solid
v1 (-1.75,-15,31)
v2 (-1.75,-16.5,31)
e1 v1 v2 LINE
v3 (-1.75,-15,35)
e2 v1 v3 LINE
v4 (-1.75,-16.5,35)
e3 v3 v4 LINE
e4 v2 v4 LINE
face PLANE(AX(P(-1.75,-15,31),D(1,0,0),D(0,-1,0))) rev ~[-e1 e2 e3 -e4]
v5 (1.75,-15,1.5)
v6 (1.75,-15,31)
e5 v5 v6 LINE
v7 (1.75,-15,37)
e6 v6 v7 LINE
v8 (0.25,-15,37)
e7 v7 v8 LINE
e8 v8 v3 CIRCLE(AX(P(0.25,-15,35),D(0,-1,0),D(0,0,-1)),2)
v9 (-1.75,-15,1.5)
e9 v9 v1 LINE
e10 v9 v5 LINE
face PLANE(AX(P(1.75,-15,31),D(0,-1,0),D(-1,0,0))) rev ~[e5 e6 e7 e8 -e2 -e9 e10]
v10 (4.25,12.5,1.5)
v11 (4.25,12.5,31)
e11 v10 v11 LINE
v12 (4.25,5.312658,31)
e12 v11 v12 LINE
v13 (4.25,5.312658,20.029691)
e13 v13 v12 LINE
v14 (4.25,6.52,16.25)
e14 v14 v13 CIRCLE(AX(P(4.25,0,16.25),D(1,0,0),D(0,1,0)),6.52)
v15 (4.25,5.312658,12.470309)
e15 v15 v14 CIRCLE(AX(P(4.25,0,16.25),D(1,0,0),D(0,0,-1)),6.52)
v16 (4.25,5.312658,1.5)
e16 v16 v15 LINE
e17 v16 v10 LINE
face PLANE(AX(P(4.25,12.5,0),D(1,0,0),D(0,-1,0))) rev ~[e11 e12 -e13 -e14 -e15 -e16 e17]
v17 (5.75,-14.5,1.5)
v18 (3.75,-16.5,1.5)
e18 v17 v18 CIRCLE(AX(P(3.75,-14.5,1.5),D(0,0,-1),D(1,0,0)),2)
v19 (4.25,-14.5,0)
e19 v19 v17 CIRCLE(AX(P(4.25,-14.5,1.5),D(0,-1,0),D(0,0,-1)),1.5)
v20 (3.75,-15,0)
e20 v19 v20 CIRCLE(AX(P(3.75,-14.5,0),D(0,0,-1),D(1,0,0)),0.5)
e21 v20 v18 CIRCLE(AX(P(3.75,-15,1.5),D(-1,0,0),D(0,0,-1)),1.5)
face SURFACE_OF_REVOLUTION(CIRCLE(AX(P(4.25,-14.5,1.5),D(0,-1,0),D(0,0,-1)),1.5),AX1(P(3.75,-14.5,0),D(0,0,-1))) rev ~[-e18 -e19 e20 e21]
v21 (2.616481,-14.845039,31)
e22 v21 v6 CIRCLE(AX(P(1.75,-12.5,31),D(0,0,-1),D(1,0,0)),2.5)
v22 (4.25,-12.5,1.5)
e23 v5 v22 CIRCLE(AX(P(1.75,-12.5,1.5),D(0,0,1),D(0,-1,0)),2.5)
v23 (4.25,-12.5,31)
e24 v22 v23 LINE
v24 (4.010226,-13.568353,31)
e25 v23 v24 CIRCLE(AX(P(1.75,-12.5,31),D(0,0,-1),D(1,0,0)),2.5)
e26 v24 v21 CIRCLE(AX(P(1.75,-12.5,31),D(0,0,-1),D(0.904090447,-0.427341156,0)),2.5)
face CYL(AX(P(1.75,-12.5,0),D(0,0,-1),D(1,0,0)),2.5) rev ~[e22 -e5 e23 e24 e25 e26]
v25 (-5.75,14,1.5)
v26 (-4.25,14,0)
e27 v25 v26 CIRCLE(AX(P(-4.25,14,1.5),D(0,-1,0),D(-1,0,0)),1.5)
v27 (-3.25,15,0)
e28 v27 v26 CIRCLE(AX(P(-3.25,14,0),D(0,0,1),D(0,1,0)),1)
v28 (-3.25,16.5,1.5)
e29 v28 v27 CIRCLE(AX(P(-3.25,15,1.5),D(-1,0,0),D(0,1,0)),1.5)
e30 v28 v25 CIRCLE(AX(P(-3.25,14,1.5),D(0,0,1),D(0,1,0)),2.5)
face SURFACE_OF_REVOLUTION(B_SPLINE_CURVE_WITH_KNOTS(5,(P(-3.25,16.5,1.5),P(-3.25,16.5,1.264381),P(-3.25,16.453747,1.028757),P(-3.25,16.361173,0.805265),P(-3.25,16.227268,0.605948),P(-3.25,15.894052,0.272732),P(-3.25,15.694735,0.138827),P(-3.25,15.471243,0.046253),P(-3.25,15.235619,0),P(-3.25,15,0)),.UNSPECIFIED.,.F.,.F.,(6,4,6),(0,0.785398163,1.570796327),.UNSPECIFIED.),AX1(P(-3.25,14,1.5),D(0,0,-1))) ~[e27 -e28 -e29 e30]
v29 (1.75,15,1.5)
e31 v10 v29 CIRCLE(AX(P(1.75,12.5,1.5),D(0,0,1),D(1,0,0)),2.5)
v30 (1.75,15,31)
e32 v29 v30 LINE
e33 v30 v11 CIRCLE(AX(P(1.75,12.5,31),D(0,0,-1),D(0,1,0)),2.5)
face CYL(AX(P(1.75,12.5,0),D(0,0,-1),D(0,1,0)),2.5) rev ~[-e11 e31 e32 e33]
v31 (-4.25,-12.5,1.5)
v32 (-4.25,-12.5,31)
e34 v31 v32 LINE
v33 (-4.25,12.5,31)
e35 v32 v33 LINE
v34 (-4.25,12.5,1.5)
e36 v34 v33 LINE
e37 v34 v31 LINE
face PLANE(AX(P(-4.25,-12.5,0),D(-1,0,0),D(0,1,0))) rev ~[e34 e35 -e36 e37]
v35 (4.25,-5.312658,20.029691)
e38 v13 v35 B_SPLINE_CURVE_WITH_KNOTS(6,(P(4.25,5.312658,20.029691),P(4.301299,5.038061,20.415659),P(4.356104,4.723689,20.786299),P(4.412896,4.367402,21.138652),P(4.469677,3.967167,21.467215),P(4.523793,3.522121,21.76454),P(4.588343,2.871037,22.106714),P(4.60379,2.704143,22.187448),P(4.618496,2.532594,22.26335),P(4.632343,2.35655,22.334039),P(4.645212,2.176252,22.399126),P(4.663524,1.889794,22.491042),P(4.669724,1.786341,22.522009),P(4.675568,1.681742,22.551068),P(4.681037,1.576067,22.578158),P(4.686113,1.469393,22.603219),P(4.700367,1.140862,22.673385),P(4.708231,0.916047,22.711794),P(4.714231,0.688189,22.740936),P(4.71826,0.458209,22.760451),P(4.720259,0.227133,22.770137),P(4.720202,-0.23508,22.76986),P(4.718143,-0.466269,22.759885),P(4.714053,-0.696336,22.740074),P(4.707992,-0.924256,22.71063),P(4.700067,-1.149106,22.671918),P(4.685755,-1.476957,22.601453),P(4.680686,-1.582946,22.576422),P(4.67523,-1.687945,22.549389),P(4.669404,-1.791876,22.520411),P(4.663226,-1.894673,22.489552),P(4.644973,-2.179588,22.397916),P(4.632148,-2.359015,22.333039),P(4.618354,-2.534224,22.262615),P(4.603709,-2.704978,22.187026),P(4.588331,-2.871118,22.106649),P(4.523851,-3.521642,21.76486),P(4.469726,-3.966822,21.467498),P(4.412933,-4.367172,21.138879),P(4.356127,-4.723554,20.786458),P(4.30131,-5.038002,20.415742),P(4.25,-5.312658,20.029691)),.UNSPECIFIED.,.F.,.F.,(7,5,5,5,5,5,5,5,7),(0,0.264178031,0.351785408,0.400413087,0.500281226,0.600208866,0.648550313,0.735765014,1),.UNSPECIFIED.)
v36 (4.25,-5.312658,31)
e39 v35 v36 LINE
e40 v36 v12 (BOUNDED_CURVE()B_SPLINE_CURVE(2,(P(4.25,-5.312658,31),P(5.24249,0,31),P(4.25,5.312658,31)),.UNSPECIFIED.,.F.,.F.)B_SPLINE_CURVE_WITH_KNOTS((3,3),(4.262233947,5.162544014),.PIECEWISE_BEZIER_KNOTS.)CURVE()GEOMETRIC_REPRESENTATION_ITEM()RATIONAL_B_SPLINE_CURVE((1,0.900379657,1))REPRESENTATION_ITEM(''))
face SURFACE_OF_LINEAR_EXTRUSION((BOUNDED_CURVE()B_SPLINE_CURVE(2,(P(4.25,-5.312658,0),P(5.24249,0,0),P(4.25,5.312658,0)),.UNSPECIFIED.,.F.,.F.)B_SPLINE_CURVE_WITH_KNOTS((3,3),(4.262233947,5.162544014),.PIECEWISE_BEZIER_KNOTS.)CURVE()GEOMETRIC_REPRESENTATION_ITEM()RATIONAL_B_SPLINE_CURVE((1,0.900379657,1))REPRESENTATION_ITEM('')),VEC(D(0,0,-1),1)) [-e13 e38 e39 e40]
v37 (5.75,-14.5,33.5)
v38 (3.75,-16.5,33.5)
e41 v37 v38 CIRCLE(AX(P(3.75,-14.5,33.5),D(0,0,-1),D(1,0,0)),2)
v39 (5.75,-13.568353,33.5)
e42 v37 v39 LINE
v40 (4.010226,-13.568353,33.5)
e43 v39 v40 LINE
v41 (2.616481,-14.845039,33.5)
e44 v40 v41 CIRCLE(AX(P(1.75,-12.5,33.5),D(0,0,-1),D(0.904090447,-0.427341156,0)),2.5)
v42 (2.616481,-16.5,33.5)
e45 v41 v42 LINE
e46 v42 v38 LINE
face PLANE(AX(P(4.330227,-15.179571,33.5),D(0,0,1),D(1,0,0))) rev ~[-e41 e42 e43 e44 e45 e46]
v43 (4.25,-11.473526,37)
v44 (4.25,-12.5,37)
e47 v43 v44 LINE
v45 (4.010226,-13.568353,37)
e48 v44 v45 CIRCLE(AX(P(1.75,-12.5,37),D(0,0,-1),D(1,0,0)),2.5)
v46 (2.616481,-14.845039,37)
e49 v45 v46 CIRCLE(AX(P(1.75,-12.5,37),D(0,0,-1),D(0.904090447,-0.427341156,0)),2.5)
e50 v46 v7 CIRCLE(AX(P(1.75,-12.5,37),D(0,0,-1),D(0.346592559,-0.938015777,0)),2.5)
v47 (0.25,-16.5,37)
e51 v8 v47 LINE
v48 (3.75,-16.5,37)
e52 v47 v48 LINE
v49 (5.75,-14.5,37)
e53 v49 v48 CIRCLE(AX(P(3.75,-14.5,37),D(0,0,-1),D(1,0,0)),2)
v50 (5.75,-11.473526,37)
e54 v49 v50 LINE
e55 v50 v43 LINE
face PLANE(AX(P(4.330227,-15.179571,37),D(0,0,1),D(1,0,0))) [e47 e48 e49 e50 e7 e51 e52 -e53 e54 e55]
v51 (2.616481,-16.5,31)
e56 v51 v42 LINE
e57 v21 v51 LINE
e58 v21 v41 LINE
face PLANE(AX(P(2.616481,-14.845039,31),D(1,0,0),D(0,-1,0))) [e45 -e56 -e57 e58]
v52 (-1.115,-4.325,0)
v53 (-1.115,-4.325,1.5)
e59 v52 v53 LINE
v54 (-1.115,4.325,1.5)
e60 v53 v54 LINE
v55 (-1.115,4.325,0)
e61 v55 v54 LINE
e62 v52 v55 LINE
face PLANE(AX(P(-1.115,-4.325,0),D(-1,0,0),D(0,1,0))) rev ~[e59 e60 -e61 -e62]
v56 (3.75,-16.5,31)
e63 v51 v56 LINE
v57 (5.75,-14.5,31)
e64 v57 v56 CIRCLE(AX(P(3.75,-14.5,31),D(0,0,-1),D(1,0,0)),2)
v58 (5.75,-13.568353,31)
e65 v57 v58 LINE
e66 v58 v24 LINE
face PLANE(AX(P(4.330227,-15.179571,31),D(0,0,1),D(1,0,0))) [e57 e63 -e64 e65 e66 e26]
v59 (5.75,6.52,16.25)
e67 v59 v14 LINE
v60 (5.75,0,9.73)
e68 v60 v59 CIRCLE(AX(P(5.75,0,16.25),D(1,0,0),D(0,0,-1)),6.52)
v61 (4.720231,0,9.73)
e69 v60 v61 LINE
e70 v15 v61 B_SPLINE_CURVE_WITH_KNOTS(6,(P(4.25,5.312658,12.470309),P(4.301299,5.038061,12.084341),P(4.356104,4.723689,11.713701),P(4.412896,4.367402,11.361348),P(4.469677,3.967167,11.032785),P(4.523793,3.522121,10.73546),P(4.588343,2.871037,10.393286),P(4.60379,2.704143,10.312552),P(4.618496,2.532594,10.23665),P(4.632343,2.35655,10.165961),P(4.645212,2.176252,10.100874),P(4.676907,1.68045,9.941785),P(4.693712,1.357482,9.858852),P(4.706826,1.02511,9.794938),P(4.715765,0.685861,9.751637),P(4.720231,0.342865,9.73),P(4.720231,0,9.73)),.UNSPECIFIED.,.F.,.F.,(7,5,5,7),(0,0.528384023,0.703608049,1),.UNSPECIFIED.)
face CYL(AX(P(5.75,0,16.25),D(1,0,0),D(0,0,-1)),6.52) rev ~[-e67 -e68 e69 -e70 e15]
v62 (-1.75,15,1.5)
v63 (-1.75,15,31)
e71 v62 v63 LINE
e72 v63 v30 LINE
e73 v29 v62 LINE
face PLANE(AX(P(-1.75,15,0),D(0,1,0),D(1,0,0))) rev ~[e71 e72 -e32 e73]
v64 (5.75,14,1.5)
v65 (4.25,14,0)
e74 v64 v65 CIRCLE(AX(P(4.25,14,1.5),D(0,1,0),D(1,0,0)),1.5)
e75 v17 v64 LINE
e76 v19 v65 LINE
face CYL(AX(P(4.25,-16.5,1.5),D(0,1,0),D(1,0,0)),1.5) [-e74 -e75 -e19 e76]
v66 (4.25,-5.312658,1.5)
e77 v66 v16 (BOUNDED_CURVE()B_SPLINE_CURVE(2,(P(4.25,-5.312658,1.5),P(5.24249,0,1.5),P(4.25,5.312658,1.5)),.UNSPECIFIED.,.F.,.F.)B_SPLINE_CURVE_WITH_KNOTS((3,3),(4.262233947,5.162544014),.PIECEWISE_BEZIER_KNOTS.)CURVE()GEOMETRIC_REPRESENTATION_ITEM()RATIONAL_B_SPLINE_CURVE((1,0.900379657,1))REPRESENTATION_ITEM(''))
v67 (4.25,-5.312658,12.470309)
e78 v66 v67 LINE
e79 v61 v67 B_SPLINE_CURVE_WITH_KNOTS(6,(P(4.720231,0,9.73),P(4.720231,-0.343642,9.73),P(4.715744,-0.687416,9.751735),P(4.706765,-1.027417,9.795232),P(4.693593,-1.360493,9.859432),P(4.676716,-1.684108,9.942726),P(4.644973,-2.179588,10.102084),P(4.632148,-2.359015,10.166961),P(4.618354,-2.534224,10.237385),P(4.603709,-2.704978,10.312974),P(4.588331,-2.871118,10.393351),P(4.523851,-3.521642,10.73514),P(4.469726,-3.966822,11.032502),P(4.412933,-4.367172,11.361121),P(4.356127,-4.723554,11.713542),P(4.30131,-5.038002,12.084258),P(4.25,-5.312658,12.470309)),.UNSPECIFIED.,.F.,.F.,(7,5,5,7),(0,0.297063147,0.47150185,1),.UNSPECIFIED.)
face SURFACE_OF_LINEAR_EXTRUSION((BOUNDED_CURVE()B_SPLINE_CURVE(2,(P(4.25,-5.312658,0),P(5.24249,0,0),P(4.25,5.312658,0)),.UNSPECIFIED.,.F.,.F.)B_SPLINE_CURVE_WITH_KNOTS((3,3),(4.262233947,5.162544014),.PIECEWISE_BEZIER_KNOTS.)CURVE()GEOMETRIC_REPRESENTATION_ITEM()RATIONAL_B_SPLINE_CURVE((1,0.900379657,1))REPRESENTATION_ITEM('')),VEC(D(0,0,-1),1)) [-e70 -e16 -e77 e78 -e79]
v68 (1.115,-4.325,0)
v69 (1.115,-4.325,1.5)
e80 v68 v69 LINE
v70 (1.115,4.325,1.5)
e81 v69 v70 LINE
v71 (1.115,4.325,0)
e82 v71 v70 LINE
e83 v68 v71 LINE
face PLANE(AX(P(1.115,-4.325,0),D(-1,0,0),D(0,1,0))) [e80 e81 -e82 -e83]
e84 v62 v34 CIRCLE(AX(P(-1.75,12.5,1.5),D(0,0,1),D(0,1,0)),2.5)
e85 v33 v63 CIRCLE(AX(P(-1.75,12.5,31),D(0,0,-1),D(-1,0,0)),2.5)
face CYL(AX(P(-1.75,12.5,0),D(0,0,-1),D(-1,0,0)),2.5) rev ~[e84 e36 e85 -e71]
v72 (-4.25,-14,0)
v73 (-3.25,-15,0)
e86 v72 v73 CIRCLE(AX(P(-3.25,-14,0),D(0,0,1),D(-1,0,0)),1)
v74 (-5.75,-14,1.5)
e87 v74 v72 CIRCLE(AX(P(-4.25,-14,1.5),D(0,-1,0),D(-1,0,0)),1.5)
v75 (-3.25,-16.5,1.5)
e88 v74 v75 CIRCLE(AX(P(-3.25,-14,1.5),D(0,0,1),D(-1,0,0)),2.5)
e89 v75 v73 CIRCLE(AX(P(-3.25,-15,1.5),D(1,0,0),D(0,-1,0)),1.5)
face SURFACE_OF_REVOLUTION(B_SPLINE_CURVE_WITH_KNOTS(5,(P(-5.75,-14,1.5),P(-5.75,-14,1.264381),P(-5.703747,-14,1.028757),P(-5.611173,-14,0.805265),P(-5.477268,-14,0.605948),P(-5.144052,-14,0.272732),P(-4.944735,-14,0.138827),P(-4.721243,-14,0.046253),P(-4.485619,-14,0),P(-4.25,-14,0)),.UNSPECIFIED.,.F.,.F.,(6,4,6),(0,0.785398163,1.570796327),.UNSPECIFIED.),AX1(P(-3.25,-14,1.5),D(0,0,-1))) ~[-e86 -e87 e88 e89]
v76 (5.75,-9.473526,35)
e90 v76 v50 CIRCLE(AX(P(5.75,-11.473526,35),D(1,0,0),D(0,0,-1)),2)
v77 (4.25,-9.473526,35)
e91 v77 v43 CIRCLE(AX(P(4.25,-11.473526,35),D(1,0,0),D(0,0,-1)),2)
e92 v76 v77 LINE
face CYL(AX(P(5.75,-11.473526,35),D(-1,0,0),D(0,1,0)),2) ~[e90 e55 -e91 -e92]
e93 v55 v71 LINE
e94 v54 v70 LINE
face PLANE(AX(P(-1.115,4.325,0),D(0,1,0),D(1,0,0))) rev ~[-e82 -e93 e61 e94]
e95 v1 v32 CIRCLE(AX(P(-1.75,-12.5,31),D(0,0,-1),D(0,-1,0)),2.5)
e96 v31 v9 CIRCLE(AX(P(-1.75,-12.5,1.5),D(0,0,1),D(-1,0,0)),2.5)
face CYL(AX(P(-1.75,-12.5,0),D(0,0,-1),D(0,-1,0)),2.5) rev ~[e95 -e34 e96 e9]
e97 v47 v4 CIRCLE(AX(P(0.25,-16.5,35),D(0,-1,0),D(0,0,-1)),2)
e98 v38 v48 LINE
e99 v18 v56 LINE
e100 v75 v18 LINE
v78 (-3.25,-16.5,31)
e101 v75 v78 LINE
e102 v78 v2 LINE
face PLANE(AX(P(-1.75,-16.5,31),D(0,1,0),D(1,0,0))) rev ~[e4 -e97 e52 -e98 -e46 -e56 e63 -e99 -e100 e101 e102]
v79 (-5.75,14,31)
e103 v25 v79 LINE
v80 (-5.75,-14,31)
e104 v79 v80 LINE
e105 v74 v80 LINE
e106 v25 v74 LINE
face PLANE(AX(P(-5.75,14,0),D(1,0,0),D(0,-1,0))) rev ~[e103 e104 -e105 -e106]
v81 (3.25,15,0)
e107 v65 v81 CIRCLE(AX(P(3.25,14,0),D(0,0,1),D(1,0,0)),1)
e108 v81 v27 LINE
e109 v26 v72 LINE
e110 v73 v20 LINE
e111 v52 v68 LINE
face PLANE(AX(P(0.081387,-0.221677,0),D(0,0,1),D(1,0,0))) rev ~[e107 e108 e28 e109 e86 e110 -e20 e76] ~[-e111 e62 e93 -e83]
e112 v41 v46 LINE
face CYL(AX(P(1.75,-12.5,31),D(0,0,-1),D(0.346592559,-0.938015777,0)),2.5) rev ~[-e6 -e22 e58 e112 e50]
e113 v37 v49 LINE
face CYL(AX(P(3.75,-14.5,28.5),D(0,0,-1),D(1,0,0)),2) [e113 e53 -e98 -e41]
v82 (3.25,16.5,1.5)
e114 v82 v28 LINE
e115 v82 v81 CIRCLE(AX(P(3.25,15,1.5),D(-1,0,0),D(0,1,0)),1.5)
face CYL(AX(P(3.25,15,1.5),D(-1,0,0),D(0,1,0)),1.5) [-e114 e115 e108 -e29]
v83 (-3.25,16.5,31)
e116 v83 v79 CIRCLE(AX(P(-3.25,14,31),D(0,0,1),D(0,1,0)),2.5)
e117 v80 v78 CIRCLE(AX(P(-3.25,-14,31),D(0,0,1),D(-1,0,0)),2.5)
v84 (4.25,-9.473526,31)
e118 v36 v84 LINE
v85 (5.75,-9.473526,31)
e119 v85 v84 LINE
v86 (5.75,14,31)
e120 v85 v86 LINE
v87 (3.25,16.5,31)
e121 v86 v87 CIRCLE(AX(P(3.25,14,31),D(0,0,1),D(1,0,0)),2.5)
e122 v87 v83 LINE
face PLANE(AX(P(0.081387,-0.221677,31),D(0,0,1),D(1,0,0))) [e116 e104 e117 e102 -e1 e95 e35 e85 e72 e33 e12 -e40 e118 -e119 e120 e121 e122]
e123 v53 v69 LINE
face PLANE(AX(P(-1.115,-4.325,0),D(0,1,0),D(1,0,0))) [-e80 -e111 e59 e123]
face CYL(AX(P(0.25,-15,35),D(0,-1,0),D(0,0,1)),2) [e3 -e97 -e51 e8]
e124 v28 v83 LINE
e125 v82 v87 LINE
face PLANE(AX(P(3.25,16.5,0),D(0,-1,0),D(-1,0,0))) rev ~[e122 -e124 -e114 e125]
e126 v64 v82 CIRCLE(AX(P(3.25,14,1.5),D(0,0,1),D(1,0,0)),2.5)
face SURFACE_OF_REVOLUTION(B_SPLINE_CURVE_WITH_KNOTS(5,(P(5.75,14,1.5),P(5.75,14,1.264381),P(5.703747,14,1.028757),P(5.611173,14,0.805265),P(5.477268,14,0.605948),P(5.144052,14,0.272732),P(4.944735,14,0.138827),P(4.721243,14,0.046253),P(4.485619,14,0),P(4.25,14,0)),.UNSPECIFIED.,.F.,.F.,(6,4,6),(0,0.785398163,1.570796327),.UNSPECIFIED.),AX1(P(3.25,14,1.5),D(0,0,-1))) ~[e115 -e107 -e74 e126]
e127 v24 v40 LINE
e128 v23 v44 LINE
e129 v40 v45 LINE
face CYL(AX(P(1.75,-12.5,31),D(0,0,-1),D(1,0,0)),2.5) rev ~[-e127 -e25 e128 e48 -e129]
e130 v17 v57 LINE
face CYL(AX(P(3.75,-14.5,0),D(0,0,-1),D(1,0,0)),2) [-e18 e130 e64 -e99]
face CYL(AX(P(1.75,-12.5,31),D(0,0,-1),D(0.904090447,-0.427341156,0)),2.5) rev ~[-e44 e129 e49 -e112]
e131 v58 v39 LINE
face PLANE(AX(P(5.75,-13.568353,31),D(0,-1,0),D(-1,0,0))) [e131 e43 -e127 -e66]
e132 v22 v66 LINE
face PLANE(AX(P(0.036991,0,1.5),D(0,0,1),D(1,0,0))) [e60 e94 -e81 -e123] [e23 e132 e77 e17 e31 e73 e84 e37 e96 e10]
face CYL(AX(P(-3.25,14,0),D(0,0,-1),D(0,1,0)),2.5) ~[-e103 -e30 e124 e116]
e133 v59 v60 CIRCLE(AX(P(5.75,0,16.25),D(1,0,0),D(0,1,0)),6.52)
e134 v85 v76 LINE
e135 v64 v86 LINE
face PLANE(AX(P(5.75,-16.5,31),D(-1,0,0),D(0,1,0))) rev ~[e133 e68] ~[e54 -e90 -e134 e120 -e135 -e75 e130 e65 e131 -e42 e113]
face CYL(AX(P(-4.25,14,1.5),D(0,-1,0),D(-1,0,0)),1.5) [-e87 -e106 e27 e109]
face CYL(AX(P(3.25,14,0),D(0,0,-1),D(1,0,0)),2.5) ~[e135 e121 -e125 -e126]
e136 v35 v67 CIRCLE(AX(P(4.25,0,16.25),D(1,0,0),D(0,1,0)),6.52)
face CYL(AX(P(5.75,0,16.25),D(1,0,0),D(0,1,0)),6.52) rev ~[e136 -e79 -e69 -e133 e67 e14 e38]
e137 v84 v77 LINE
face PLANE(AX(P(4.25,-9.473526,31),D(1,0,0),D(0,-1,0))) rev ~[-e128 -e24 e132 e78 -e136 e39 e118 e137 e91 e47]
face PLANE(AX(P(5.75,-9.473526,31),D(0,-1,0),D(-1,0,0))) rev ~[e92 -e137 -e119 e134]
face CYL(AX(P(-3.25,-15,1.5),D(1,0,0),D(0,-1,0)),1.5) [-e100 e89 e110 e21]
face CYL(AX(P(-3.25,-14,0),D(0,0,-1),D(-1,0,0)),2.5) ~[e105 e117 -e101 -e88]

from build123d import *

# Parameters (mm, degrees)
F0_W         = 2.23
F0_H         = 8.65
F1_DEPTH     = 1.5
F2_DEPTH     = 31
F5_DEPTH     = 2
F6_R         = 1.5
F7_DEPTH     = 6
F8_R         = 2
F9_DEPTH     = 2.5
F10_T1_DEPTH = 13.5
F10_T3_DEPTH = 36
F10_T6_ANGLE = 90


# Not quite as in the source:
# - a fillet or chamfer that OpenCascade refuses, or shapes differently, is made with other operations: its cross-section is extruded or revolved along the edge and cut away or added
# - a feature names something its author has since deleted; it is built from what else it names


with BuildPart() as f1:
    # F0 (on Top) → F1 (new body)
    with BuildSketch(Plane.XY):
        with BuildLine():
            Line((-1.75, -15), (1.75, -15))
            ThreePointArc((1.75, -15), (3.517766953, -14.267766953), (4.25, -12.5))
            Line((4.25, -12.5), (4.25, -5.3126580607))
            add(Edge.make_bspline(
                [(4.25, -5.3126580607), (5.242489647, 0), (4.25, 5.3126580607)],
                knots=[4.2622339472, 4.2622339472, 4.2622339472, 5.1625440136, 5.1625440136, 5.1625440136], degree=2, weights=[1, 0.9003796574, 1]))
            Line((4.25, 5.3126580607), (4.25, 12.5))
            ThreePointArc((4.25, 12.5), (3.517766953, 14.267766953), (1.75, 15))
            Line((1.75, 15), (-1.75, 15))
            ThreePointArc((-1.75, 15), (-3.517766953, 14.267766953), (-4.25, 12.5))
            Line((-4.25, 12.5), (-4.25, -12.5))
            ThreePointArc((-4.25, -12.5), (-3.517766953, -14.267766953), (-1.75, -15))
        make_face()
        Rectangle(F0_W, F0_H, mode=Mode.SUBTRACT)
    extrude(amount=F1_DEPTH)

    # F0 (on Top) → F2 (join)
    with BuildSketch(Plane.XY):
        with BuildLine():
            ThreePointArc((5.75, 14), (5.017766953, 15.767766953), (3.25, 16.5))
            Line((3.25, 16.5), (-3.25, 16.5))
            ThreePointArc((-3.25, 16.5), (-5.017766953, 15.767766953), (-5.75, 14))
            Line((-5.75, 14), (-5.75, -14))
            ThreePointArc((-5.75, -14), (-5.017766953, -15.767766953), (-3.25, -16.5))
            Line((-3.25, -16.5), (5.75, -16.5))
            Line((5.75, -16.5), (5.75, 14))
        make_face()
        with BuildLine():
            ThreePointArc((4.25, -12.5), (3.517766953, -14.267766953), (1.75, -15))
            Line((1.75, -15), (-1.75, -15))
            ThreePointArc((-1.75, -15), (-3.517766953, -14.267766953), (-4.25, -12.5))
            Line((-4.25, -12.5), (-4.25, 12.5))
            ThreePointArc((-4.25, 12.5), (-3.517766953, 14.267766953), (-1.75, 15))
            Line((-1.75, 15), (1.75, 15))
            ThreePointArc((1.75, 15), (3.517766953, 14.267766953), (4.25, 12.5))
            Line((4.25, 12.5), (4.25, 5.3126580607))
            add(Edge.make_bspline(
                [(4.25, -5.3126580607), (5.242489647, 0), (4.25, 5.3126580607)],
                knots=[4.2622339472, 4.2622339472, 4.2622339472, 5.1625440136, 5.1625440136, 5.1625440136], degree=2, weights=[1, 0.9003796574, 1]))
            Line((4.25, -5.3126580607), (4.25, -12.5))
        make_face(mode=Mode.SUBTRACT)
    extrude(amount=F2_DEPTH)

    # F4 (on face) → F5 (cut)
    with BuildSketch(Plane.YZ.offset(5.75)):
        with BuildLine():
            ThreePointArc((6.52, 16.25), (-4.6103362133, 20.8603362133), (0, 9.73))
            ThreePointArc((0, 9.73), (4.6103362133, 11.6396637867), (6.52, 16.25))
        make_face()
    extrude(amount=-F5_DEPTH, mode=Mode.SUBTRACT)

    # F6
    f6_edges = [f1.edges().sort_by_distance(p)[0] for p in [
        (5.75, -1.25, 0),
    ]]
    fillet(f6_edges, radius=F6_R)

    # F3 (on face) → F7 (join)
    with BuildSketch(Plane.XY.offset(31)):
        with BuildLine():
            Line((2.6164813973, -14.8450394427), (2.6164813973, -16.5))
            Line((2.6164813973, -16.5), (5.75, -16.5))
            Line((5.75, -16.5), (5.75, -13.5683528888))
            Line((5.75, -13.5683528888), (4.0102261181, -13.5683528888))
            ThreePointArc((4.0102261181, -13.5683528888), (3.4386554151, -14.3434866121), (2.6164813973, -14.8450394427))
        make_face()
        with BuildLine():
            Line((4.0102261181, -13.5683528888), (5.75, -13.5683528888))
            Line((5.75, -13.5683528888), (5.75, -9.473525919))
            Line((5.75, -9.473525919), (4.25, -9.473525919))
            Line((4.25, -9.473525919), (4.25, -12.5))
            ThreePointArc((4.25, -12.5), (4.18932012, -13.0474644759), (4.0102261181, -13.5683528888))
        make_face()
        with BuildLine():
            Line((-1.75, -15), (-1.75, -16.5))
            Line((-1.75, -16.5), (2.6164813973, -16.5))
            Line((2.6164813973, -16.5), (2.6164813973, -14.8450394427))
            ThreePointArc((2.6164813973, -14.8450394427), (2.190114413, -14.9609549576), (1.75, -15))
            Line((1.75, -15), (-1.75, -15))
        make_face()
    extrude(amount=F7_DEPTH)

    # F8
    f8_edges = [f1.edges().sort_by_distance(p)[0] for p in [
        (-1.75, -15.75, 37),
        (5, -9.473526, 37),
    ]]
    fillet(f8_edges, radius=F8_R)

    # F3 (on face) → F9 (cut)
    with BuildSketch(Plane.XY.offset(31)):
        with BuildLine():
            Line((2.6164813973, -14.8450394427), (2.6164813973, -16.5))
            Line((2.6164813973, -16.5), (5.75, -16.5))
            Line((5.75, -16.5), (5.75, -13.5683528888))
            Line((5.75, -13.5683528888), (4.0102261181, -13.5683528888))
            ThreePointArc((4.0102261181, -13.5683528888), (3.4386554151, -14.3434866121), (2.6164813973, -14.8450394427))
        make_face()
    extrude(amount=F9_DEPTH, mode=Mode.SUBTRACT)

    # F10: fillet of radius 2 on 2 edges, made by hand

    # F10_s2 → F10_t1 (cut)
    with BuildSketch(Plane.XY.offset(28.5)):
        with BuildLine():
            ThreePointArc((5.75, -14.5), (5.1642135624, -15.9142135624), (3.75, -16.5))
            Line((3.75, -16.5), (5.75, -16.5))
            Line((5.75, -16.5), (5.75, -14.5))
        make_face()
    extrude(amount=F10_T1_DEPTH, mode=Mode.SUBTRACT)

    # F10_s4 → F10_t3 (cut)
    with BuildSketch(Plane.XY):
        with BuildLine():
            ThreePointArc((5.75, -14.5), (5.1642135624, -15.9142135624), (3.75, -16.5))
            Line((3.75, -16.5), (5.75, -16.5))
            Line((5.75, -16.5), (5.75, -14.5))
        make_face()
    extrude(amount=F10_T3_DEPTH, mode=Mode.SUBTRACT)

    # F10_s5 → F10_t6 (revolve, cut)
    with BuildSketch(Plane.XZ.offset(14.5)):
        with BuildLine():
            ThreePointArc((4.25, 0), (5.3106601718, 0.4393398282), (5.75, 1.5))
            Line((5.75, 1.5), (5.75, 0))
            Line((5.75, 0), (4.25, 0))
        make_face()
    revolve(axis=Axis((3.75, -14.5, 0), (0, 0, -1)), revolution_arc=F10_T6_ANGLE, mode=Mode.SUBTRACT)


solid = f1.part
